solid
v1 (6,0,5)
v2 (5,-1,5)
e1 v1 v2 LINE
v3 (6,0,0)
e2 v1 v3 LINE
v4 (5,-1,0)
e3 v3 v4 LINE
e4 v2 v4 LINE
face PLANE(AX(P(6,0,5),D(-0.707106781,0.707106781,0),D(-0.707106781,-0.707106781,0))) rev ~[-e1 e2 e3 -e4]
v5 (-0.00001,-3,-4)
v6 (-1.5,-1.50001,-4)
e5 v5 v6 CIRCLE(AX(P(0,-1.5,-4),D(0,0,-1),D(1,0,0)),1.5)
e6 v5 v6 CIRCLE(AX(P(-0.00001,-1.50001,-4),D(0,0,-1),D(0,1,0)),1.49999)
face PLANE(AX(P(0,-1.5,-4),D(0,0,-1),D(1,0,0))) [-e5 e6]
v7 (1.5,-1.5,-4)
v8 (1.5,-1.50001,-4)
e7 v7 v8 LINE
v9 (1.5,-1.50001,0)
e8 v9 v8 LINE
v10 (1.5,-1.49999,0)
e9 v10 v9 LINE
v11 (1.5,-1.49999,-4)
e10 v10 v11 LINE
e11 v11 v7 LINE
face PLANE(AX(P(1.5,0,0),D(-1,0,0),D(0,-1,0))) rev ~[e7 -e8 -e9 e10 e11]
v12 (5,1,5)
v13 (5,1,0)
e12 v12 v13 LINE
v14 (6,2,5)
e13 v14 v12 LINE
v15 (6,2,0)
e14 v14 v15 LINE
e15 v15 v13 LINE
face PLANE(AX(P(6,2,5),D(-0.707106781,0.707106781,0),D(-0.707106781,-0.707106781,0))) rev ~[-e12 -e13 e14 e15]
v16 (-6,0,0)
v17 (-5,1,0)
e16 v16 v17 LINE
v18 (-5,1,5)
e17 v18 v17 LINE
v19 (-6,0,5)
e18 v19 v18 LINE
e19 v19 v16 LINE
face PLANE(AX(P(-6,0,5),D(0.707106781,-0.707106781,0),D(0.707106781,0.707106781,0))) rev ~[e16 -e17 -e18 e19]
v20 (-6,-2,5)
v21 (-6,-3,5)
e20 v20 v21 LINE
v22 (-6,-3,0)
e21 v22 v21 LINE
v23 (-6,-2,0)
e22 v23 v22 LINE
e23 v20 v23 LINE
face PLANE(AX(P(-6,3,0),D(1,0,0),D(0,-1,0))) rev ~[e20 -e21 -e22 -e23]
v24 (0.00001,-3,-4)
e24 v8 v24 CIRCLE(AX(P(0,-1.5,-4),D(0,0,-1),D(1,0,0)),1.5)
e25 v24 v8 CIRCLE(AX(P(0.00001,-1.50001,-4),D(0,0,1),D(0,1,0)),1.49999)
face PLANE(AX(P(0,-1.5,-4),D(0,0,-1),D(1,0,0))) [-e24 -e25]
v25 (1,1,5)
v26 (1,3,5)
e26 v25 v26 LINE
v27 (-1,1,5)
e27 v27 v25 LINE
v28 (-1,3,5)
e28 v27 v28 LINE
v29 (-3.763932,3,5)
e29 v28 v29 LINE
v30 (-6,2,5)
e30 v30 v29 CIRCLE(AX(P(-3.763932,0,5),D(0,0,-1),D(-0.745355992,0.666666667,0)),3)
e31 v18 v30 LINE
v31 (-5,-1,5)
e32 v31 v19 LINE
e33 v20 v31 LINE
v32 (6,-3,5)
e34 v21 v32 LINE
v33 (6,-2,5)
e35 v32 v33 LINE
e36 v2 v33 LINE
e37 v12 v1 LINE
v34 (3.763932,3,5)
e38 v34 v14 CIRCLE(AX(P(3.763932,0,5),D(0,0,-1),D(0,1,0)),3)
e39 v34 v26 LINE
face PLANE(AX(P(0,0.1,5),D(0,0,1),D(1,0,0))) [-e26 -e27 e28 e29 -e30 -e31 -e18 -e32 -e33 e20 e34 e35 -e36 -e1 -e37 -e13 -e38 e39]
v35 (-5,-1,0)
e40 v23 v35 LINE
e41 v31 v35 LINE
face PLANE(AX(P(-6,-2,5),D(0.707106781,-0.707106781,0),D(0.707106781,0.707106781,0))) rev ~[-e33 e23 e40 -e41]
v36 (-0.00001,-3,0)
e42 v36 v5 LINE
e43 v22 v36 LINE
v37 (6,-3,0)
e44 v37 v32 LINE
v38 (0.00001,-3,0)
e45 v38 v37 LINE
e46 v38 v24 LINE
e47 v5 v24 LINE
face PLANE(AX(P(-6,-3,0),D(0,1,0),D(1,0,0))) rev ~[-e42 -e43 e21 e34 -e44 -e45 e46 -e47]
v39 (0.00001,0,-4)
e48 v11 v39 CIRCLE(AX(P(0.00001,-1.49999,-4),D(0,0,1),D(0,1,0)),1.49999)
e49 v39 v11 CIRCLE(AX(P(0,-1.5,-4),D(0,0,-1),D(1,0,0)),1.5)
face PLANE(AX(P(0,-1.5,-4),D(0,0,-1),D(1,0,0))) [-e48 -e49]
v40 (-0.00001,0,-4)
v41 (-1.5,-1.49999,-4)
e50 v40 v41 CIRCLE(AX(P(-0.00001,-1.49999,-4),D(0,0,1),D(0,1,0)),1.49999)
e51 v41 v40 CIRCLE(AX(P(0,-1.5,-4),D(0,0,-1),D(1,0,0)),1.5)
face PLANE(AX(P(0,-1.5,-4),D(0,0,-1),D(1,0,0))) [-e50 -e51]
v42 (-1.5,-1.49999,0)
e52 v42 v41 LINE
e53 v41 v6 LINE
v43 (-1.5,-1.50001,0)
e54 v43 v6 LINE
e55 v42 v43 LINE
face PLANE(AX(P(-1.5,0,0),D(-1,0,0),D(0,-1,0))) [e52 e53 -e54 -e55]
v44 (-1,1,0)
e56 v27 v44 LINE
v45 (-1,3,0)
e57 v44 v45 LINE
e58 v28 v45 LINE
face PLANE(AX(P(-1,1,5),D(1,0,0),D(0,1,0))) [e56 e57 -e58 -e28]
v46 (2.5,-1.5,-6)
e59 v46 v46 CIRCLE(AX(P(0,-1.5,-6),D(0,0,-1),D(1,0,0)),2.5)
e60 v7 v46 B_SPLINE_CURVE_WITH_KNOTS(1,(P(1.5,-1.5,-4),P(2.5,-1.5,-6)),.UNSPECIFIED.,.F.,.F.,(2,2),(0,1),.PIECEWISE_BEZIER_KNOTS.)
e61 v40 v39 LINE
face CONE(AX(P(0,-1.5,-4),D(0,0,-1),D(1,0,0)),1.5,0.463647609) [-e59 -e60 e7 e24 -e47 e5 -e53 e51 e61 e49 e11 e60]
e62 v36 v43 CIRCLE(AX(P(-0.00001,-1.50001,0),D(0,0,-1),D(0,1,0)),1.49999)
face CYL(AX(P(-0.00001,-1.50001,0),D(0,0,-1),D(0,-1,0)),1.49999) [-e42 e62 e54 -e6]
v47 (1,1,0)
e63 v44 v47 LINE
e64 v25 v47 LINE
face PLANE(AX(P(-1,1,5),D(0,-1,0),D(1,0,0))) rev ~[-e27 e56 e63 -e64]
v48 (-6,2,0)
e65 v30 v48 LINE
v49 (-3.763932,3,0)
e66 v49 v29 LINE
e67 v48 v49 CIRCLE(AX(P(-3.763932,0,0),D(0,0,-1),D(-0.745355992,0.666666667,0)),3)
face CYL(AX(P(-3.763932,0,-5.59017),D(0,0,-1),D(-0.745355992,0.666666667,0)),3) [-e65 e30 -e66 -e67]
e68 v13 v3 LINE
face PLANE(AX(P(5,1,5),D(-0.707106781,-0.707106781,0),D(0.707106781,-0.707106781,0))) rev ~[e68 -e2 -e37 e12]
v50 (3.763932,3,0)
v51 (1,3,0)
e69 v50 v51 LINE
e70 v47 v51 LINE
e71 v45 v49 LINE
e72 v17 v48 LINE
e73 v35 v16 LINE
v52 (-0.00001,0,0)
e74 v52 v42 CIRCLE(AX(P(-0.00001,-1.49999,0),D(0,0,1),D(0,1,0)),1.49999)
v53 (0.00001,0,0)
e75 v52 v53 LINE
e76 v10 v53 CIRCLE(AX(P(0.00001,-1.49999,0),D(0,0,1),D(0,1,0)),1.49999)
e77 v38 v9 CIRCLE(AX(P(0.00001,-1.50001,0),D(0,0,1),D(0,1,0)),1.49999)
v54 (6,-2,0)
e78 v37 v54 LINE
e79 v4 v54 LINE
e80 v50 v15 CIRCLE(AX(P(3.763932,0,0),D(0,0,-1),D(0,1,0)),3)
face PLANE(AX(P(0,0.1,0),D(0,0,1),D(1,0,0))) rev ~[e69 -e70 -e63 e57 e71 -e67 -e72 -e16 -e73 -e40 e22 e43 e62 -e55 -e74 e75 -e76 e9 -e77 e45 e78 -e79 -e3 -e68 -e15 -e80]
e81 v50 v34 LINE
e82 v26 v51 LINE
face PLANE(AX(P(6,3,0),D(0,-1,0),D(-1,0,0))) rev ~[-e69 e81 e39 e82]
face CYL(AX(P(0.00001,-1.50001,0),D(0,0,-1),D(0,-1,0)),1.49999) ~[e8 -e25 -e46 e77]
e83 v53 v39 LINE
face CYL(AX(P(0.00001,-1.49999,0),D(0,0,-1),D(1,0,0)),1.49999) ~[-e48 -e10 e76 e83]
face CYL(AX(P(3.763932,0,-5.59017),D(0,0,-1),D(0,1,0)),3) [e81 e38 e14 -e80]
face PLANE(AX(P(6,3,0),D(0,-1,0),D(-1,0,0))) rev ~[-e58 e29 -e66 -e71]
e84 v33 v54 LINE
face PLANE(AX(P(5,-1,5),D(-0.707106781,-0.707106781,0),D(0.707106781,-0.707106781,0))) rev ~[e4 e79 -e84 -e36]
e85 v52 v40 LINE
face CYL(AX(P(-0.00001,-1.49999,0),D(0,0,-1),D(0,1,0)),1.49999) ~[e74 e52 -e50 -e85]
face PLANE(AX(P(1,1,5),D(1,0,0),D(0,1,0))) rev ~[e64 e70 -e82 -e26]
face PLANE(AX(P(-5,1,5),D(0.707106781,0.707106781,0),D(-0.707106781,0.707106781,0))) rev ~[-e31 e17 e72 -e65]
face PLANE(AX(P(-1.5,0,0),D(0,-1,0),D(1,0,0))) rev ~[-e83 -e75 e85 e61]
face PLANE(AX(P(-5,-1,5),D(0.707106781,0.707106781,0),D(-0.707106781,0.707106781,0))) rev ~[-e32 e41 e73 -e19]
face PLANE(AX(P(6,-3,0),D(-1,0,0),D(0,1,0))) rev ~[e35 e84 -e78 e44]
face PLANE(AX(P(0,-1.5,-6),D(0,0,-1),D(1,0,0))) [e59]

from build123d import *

# Parameters (mm, degrees)
F0_W        = 2
F0_H        = 2
F1_DEPTH    = 5
F2_W        = 3
F2_H        = 3
F3_DEPTH    = 4
F4_R        = 1.49999
F5_W        = 2
F5_H        = 2
F6_DEPTH    = 5
F8_DEPTH    = 9.001
F9_T1_DEPTH = 16.1803398875
F10_R       = 1.5
F12_R       = 2.5


# Not quite as in the source:
# - a fillet or chamfer that OpenCascade refuses, or shapes differently, is made with other operations: its cross-section is extruded or revolved along the edge and cut away or added
# - a fillet or chamfer is up to 0.001 mm smaller than in the source, because OpenCascade refuses the exact size


with BuildPart() as f1:
    # F0 (on Top) → F1 (new body)
    with BuildSketch(Plane.XY):
        Polygon((-6, -3), (6, -3), (6, 3), (1, 3), (1, 1), (-1, 1), (-1, 3), (-6, 3), align=None)
        with Locations((0, 2)):
            Rectangle(F0_W, F0_H)
    extrude(amount=F1_DEPTH)

    # F2 (on face) → F3 (join)
    with BuildSketch(Plane(origin=(0, 0, 0), x_dir=(1, 0, 0), z_dir=(0, 0, -1))):
        with Locations((0, 1.5)):
            Rectangle(F2_W, F2_H)
    extrude(amount=F3_DEPTH)

    # F4 (radius 1.5 in the source; OpenCascade refuses exactly that, so slightly less here)
    f4_edges = [f1.edges().sort_by_distance(p)[0] for p in [
        (-1.5, 0, -2),
        (1.5, 0, -2),
        (-1.5, -3, -2),
        (1.5, -3, -2),
    ]]
    fillet(f4_edges, radius=F4_R)

    # F5 (on face) → F6 (cut, through all)
    with BuildSketch(Plane.XY.offset(5)):
        with Locations((0, 2)):
            Rectangle(F5_W, F5_H)
    extrude(amount=-F6_DEPTH, mode=Mode.SUBTRACT)

    # F7 (on face) → F8 (cut, through all)
    with BuildSketch(Plane.XY.offset(5)):
        Polygon((-5, 1), (-6, 2), (-6, 0), align=None)
        Polygon((-5, -1), (-6, 0), (-6, -2), align=None)
        Polygon((6, -2), (6, 0), (5, -1), align=None)
        Polygon((6, 0), (6, 2), (5, 1), align=None)
    extrude(amount=-F8_DEPTH, mode=Mode.SUBTRACT)

    # F9: fillet of radius 3 on 2 edges, made by hand

    # F9_s2 → F9_t1 (cut)
    with BuildSketch(Plane.XY.offset(-5.5901699437)):
        with BuildLine():
            ThreePointArc((-6, 2), (-4.9886768939, 2.7386127875), (-3.7639320225, 3))
            Line((-3.7639320225, 3), (-6, 3))
            Line((-6, 3), (-6, 2))
        make_face()
        with BuildLine():
            ThreePointArc((3.7639320225, 3), (4.9886768939, 2.7386127875), (6, 2))
            Line((6, 2), (6, 3))
            Line((6, 3), (3.7639320225, 3))
        make_face()
    extrude(amount=F9_T1_DEPTH, mode=Mode.SUBTRACT)

    # F10 (on face) → F13 section 0
    with BuildSketch(Plane(origin=(0, 0, -4), x_dir=(1, 0, 0), z_dir=(0, 0, -1))):
        with Locations((0, 1.5)):
            Circle(F10_R)
    # F12 (on offset) → F13 section 1
    with BuildSketch(Plane(origin=(0, 0, -6), x_dir=(1, 0, 0), z_dir=(0, 0, -1))):
        with Locations((0, 1.5)):
            Circle(F12_R)
    loft()


solid = f1.part
